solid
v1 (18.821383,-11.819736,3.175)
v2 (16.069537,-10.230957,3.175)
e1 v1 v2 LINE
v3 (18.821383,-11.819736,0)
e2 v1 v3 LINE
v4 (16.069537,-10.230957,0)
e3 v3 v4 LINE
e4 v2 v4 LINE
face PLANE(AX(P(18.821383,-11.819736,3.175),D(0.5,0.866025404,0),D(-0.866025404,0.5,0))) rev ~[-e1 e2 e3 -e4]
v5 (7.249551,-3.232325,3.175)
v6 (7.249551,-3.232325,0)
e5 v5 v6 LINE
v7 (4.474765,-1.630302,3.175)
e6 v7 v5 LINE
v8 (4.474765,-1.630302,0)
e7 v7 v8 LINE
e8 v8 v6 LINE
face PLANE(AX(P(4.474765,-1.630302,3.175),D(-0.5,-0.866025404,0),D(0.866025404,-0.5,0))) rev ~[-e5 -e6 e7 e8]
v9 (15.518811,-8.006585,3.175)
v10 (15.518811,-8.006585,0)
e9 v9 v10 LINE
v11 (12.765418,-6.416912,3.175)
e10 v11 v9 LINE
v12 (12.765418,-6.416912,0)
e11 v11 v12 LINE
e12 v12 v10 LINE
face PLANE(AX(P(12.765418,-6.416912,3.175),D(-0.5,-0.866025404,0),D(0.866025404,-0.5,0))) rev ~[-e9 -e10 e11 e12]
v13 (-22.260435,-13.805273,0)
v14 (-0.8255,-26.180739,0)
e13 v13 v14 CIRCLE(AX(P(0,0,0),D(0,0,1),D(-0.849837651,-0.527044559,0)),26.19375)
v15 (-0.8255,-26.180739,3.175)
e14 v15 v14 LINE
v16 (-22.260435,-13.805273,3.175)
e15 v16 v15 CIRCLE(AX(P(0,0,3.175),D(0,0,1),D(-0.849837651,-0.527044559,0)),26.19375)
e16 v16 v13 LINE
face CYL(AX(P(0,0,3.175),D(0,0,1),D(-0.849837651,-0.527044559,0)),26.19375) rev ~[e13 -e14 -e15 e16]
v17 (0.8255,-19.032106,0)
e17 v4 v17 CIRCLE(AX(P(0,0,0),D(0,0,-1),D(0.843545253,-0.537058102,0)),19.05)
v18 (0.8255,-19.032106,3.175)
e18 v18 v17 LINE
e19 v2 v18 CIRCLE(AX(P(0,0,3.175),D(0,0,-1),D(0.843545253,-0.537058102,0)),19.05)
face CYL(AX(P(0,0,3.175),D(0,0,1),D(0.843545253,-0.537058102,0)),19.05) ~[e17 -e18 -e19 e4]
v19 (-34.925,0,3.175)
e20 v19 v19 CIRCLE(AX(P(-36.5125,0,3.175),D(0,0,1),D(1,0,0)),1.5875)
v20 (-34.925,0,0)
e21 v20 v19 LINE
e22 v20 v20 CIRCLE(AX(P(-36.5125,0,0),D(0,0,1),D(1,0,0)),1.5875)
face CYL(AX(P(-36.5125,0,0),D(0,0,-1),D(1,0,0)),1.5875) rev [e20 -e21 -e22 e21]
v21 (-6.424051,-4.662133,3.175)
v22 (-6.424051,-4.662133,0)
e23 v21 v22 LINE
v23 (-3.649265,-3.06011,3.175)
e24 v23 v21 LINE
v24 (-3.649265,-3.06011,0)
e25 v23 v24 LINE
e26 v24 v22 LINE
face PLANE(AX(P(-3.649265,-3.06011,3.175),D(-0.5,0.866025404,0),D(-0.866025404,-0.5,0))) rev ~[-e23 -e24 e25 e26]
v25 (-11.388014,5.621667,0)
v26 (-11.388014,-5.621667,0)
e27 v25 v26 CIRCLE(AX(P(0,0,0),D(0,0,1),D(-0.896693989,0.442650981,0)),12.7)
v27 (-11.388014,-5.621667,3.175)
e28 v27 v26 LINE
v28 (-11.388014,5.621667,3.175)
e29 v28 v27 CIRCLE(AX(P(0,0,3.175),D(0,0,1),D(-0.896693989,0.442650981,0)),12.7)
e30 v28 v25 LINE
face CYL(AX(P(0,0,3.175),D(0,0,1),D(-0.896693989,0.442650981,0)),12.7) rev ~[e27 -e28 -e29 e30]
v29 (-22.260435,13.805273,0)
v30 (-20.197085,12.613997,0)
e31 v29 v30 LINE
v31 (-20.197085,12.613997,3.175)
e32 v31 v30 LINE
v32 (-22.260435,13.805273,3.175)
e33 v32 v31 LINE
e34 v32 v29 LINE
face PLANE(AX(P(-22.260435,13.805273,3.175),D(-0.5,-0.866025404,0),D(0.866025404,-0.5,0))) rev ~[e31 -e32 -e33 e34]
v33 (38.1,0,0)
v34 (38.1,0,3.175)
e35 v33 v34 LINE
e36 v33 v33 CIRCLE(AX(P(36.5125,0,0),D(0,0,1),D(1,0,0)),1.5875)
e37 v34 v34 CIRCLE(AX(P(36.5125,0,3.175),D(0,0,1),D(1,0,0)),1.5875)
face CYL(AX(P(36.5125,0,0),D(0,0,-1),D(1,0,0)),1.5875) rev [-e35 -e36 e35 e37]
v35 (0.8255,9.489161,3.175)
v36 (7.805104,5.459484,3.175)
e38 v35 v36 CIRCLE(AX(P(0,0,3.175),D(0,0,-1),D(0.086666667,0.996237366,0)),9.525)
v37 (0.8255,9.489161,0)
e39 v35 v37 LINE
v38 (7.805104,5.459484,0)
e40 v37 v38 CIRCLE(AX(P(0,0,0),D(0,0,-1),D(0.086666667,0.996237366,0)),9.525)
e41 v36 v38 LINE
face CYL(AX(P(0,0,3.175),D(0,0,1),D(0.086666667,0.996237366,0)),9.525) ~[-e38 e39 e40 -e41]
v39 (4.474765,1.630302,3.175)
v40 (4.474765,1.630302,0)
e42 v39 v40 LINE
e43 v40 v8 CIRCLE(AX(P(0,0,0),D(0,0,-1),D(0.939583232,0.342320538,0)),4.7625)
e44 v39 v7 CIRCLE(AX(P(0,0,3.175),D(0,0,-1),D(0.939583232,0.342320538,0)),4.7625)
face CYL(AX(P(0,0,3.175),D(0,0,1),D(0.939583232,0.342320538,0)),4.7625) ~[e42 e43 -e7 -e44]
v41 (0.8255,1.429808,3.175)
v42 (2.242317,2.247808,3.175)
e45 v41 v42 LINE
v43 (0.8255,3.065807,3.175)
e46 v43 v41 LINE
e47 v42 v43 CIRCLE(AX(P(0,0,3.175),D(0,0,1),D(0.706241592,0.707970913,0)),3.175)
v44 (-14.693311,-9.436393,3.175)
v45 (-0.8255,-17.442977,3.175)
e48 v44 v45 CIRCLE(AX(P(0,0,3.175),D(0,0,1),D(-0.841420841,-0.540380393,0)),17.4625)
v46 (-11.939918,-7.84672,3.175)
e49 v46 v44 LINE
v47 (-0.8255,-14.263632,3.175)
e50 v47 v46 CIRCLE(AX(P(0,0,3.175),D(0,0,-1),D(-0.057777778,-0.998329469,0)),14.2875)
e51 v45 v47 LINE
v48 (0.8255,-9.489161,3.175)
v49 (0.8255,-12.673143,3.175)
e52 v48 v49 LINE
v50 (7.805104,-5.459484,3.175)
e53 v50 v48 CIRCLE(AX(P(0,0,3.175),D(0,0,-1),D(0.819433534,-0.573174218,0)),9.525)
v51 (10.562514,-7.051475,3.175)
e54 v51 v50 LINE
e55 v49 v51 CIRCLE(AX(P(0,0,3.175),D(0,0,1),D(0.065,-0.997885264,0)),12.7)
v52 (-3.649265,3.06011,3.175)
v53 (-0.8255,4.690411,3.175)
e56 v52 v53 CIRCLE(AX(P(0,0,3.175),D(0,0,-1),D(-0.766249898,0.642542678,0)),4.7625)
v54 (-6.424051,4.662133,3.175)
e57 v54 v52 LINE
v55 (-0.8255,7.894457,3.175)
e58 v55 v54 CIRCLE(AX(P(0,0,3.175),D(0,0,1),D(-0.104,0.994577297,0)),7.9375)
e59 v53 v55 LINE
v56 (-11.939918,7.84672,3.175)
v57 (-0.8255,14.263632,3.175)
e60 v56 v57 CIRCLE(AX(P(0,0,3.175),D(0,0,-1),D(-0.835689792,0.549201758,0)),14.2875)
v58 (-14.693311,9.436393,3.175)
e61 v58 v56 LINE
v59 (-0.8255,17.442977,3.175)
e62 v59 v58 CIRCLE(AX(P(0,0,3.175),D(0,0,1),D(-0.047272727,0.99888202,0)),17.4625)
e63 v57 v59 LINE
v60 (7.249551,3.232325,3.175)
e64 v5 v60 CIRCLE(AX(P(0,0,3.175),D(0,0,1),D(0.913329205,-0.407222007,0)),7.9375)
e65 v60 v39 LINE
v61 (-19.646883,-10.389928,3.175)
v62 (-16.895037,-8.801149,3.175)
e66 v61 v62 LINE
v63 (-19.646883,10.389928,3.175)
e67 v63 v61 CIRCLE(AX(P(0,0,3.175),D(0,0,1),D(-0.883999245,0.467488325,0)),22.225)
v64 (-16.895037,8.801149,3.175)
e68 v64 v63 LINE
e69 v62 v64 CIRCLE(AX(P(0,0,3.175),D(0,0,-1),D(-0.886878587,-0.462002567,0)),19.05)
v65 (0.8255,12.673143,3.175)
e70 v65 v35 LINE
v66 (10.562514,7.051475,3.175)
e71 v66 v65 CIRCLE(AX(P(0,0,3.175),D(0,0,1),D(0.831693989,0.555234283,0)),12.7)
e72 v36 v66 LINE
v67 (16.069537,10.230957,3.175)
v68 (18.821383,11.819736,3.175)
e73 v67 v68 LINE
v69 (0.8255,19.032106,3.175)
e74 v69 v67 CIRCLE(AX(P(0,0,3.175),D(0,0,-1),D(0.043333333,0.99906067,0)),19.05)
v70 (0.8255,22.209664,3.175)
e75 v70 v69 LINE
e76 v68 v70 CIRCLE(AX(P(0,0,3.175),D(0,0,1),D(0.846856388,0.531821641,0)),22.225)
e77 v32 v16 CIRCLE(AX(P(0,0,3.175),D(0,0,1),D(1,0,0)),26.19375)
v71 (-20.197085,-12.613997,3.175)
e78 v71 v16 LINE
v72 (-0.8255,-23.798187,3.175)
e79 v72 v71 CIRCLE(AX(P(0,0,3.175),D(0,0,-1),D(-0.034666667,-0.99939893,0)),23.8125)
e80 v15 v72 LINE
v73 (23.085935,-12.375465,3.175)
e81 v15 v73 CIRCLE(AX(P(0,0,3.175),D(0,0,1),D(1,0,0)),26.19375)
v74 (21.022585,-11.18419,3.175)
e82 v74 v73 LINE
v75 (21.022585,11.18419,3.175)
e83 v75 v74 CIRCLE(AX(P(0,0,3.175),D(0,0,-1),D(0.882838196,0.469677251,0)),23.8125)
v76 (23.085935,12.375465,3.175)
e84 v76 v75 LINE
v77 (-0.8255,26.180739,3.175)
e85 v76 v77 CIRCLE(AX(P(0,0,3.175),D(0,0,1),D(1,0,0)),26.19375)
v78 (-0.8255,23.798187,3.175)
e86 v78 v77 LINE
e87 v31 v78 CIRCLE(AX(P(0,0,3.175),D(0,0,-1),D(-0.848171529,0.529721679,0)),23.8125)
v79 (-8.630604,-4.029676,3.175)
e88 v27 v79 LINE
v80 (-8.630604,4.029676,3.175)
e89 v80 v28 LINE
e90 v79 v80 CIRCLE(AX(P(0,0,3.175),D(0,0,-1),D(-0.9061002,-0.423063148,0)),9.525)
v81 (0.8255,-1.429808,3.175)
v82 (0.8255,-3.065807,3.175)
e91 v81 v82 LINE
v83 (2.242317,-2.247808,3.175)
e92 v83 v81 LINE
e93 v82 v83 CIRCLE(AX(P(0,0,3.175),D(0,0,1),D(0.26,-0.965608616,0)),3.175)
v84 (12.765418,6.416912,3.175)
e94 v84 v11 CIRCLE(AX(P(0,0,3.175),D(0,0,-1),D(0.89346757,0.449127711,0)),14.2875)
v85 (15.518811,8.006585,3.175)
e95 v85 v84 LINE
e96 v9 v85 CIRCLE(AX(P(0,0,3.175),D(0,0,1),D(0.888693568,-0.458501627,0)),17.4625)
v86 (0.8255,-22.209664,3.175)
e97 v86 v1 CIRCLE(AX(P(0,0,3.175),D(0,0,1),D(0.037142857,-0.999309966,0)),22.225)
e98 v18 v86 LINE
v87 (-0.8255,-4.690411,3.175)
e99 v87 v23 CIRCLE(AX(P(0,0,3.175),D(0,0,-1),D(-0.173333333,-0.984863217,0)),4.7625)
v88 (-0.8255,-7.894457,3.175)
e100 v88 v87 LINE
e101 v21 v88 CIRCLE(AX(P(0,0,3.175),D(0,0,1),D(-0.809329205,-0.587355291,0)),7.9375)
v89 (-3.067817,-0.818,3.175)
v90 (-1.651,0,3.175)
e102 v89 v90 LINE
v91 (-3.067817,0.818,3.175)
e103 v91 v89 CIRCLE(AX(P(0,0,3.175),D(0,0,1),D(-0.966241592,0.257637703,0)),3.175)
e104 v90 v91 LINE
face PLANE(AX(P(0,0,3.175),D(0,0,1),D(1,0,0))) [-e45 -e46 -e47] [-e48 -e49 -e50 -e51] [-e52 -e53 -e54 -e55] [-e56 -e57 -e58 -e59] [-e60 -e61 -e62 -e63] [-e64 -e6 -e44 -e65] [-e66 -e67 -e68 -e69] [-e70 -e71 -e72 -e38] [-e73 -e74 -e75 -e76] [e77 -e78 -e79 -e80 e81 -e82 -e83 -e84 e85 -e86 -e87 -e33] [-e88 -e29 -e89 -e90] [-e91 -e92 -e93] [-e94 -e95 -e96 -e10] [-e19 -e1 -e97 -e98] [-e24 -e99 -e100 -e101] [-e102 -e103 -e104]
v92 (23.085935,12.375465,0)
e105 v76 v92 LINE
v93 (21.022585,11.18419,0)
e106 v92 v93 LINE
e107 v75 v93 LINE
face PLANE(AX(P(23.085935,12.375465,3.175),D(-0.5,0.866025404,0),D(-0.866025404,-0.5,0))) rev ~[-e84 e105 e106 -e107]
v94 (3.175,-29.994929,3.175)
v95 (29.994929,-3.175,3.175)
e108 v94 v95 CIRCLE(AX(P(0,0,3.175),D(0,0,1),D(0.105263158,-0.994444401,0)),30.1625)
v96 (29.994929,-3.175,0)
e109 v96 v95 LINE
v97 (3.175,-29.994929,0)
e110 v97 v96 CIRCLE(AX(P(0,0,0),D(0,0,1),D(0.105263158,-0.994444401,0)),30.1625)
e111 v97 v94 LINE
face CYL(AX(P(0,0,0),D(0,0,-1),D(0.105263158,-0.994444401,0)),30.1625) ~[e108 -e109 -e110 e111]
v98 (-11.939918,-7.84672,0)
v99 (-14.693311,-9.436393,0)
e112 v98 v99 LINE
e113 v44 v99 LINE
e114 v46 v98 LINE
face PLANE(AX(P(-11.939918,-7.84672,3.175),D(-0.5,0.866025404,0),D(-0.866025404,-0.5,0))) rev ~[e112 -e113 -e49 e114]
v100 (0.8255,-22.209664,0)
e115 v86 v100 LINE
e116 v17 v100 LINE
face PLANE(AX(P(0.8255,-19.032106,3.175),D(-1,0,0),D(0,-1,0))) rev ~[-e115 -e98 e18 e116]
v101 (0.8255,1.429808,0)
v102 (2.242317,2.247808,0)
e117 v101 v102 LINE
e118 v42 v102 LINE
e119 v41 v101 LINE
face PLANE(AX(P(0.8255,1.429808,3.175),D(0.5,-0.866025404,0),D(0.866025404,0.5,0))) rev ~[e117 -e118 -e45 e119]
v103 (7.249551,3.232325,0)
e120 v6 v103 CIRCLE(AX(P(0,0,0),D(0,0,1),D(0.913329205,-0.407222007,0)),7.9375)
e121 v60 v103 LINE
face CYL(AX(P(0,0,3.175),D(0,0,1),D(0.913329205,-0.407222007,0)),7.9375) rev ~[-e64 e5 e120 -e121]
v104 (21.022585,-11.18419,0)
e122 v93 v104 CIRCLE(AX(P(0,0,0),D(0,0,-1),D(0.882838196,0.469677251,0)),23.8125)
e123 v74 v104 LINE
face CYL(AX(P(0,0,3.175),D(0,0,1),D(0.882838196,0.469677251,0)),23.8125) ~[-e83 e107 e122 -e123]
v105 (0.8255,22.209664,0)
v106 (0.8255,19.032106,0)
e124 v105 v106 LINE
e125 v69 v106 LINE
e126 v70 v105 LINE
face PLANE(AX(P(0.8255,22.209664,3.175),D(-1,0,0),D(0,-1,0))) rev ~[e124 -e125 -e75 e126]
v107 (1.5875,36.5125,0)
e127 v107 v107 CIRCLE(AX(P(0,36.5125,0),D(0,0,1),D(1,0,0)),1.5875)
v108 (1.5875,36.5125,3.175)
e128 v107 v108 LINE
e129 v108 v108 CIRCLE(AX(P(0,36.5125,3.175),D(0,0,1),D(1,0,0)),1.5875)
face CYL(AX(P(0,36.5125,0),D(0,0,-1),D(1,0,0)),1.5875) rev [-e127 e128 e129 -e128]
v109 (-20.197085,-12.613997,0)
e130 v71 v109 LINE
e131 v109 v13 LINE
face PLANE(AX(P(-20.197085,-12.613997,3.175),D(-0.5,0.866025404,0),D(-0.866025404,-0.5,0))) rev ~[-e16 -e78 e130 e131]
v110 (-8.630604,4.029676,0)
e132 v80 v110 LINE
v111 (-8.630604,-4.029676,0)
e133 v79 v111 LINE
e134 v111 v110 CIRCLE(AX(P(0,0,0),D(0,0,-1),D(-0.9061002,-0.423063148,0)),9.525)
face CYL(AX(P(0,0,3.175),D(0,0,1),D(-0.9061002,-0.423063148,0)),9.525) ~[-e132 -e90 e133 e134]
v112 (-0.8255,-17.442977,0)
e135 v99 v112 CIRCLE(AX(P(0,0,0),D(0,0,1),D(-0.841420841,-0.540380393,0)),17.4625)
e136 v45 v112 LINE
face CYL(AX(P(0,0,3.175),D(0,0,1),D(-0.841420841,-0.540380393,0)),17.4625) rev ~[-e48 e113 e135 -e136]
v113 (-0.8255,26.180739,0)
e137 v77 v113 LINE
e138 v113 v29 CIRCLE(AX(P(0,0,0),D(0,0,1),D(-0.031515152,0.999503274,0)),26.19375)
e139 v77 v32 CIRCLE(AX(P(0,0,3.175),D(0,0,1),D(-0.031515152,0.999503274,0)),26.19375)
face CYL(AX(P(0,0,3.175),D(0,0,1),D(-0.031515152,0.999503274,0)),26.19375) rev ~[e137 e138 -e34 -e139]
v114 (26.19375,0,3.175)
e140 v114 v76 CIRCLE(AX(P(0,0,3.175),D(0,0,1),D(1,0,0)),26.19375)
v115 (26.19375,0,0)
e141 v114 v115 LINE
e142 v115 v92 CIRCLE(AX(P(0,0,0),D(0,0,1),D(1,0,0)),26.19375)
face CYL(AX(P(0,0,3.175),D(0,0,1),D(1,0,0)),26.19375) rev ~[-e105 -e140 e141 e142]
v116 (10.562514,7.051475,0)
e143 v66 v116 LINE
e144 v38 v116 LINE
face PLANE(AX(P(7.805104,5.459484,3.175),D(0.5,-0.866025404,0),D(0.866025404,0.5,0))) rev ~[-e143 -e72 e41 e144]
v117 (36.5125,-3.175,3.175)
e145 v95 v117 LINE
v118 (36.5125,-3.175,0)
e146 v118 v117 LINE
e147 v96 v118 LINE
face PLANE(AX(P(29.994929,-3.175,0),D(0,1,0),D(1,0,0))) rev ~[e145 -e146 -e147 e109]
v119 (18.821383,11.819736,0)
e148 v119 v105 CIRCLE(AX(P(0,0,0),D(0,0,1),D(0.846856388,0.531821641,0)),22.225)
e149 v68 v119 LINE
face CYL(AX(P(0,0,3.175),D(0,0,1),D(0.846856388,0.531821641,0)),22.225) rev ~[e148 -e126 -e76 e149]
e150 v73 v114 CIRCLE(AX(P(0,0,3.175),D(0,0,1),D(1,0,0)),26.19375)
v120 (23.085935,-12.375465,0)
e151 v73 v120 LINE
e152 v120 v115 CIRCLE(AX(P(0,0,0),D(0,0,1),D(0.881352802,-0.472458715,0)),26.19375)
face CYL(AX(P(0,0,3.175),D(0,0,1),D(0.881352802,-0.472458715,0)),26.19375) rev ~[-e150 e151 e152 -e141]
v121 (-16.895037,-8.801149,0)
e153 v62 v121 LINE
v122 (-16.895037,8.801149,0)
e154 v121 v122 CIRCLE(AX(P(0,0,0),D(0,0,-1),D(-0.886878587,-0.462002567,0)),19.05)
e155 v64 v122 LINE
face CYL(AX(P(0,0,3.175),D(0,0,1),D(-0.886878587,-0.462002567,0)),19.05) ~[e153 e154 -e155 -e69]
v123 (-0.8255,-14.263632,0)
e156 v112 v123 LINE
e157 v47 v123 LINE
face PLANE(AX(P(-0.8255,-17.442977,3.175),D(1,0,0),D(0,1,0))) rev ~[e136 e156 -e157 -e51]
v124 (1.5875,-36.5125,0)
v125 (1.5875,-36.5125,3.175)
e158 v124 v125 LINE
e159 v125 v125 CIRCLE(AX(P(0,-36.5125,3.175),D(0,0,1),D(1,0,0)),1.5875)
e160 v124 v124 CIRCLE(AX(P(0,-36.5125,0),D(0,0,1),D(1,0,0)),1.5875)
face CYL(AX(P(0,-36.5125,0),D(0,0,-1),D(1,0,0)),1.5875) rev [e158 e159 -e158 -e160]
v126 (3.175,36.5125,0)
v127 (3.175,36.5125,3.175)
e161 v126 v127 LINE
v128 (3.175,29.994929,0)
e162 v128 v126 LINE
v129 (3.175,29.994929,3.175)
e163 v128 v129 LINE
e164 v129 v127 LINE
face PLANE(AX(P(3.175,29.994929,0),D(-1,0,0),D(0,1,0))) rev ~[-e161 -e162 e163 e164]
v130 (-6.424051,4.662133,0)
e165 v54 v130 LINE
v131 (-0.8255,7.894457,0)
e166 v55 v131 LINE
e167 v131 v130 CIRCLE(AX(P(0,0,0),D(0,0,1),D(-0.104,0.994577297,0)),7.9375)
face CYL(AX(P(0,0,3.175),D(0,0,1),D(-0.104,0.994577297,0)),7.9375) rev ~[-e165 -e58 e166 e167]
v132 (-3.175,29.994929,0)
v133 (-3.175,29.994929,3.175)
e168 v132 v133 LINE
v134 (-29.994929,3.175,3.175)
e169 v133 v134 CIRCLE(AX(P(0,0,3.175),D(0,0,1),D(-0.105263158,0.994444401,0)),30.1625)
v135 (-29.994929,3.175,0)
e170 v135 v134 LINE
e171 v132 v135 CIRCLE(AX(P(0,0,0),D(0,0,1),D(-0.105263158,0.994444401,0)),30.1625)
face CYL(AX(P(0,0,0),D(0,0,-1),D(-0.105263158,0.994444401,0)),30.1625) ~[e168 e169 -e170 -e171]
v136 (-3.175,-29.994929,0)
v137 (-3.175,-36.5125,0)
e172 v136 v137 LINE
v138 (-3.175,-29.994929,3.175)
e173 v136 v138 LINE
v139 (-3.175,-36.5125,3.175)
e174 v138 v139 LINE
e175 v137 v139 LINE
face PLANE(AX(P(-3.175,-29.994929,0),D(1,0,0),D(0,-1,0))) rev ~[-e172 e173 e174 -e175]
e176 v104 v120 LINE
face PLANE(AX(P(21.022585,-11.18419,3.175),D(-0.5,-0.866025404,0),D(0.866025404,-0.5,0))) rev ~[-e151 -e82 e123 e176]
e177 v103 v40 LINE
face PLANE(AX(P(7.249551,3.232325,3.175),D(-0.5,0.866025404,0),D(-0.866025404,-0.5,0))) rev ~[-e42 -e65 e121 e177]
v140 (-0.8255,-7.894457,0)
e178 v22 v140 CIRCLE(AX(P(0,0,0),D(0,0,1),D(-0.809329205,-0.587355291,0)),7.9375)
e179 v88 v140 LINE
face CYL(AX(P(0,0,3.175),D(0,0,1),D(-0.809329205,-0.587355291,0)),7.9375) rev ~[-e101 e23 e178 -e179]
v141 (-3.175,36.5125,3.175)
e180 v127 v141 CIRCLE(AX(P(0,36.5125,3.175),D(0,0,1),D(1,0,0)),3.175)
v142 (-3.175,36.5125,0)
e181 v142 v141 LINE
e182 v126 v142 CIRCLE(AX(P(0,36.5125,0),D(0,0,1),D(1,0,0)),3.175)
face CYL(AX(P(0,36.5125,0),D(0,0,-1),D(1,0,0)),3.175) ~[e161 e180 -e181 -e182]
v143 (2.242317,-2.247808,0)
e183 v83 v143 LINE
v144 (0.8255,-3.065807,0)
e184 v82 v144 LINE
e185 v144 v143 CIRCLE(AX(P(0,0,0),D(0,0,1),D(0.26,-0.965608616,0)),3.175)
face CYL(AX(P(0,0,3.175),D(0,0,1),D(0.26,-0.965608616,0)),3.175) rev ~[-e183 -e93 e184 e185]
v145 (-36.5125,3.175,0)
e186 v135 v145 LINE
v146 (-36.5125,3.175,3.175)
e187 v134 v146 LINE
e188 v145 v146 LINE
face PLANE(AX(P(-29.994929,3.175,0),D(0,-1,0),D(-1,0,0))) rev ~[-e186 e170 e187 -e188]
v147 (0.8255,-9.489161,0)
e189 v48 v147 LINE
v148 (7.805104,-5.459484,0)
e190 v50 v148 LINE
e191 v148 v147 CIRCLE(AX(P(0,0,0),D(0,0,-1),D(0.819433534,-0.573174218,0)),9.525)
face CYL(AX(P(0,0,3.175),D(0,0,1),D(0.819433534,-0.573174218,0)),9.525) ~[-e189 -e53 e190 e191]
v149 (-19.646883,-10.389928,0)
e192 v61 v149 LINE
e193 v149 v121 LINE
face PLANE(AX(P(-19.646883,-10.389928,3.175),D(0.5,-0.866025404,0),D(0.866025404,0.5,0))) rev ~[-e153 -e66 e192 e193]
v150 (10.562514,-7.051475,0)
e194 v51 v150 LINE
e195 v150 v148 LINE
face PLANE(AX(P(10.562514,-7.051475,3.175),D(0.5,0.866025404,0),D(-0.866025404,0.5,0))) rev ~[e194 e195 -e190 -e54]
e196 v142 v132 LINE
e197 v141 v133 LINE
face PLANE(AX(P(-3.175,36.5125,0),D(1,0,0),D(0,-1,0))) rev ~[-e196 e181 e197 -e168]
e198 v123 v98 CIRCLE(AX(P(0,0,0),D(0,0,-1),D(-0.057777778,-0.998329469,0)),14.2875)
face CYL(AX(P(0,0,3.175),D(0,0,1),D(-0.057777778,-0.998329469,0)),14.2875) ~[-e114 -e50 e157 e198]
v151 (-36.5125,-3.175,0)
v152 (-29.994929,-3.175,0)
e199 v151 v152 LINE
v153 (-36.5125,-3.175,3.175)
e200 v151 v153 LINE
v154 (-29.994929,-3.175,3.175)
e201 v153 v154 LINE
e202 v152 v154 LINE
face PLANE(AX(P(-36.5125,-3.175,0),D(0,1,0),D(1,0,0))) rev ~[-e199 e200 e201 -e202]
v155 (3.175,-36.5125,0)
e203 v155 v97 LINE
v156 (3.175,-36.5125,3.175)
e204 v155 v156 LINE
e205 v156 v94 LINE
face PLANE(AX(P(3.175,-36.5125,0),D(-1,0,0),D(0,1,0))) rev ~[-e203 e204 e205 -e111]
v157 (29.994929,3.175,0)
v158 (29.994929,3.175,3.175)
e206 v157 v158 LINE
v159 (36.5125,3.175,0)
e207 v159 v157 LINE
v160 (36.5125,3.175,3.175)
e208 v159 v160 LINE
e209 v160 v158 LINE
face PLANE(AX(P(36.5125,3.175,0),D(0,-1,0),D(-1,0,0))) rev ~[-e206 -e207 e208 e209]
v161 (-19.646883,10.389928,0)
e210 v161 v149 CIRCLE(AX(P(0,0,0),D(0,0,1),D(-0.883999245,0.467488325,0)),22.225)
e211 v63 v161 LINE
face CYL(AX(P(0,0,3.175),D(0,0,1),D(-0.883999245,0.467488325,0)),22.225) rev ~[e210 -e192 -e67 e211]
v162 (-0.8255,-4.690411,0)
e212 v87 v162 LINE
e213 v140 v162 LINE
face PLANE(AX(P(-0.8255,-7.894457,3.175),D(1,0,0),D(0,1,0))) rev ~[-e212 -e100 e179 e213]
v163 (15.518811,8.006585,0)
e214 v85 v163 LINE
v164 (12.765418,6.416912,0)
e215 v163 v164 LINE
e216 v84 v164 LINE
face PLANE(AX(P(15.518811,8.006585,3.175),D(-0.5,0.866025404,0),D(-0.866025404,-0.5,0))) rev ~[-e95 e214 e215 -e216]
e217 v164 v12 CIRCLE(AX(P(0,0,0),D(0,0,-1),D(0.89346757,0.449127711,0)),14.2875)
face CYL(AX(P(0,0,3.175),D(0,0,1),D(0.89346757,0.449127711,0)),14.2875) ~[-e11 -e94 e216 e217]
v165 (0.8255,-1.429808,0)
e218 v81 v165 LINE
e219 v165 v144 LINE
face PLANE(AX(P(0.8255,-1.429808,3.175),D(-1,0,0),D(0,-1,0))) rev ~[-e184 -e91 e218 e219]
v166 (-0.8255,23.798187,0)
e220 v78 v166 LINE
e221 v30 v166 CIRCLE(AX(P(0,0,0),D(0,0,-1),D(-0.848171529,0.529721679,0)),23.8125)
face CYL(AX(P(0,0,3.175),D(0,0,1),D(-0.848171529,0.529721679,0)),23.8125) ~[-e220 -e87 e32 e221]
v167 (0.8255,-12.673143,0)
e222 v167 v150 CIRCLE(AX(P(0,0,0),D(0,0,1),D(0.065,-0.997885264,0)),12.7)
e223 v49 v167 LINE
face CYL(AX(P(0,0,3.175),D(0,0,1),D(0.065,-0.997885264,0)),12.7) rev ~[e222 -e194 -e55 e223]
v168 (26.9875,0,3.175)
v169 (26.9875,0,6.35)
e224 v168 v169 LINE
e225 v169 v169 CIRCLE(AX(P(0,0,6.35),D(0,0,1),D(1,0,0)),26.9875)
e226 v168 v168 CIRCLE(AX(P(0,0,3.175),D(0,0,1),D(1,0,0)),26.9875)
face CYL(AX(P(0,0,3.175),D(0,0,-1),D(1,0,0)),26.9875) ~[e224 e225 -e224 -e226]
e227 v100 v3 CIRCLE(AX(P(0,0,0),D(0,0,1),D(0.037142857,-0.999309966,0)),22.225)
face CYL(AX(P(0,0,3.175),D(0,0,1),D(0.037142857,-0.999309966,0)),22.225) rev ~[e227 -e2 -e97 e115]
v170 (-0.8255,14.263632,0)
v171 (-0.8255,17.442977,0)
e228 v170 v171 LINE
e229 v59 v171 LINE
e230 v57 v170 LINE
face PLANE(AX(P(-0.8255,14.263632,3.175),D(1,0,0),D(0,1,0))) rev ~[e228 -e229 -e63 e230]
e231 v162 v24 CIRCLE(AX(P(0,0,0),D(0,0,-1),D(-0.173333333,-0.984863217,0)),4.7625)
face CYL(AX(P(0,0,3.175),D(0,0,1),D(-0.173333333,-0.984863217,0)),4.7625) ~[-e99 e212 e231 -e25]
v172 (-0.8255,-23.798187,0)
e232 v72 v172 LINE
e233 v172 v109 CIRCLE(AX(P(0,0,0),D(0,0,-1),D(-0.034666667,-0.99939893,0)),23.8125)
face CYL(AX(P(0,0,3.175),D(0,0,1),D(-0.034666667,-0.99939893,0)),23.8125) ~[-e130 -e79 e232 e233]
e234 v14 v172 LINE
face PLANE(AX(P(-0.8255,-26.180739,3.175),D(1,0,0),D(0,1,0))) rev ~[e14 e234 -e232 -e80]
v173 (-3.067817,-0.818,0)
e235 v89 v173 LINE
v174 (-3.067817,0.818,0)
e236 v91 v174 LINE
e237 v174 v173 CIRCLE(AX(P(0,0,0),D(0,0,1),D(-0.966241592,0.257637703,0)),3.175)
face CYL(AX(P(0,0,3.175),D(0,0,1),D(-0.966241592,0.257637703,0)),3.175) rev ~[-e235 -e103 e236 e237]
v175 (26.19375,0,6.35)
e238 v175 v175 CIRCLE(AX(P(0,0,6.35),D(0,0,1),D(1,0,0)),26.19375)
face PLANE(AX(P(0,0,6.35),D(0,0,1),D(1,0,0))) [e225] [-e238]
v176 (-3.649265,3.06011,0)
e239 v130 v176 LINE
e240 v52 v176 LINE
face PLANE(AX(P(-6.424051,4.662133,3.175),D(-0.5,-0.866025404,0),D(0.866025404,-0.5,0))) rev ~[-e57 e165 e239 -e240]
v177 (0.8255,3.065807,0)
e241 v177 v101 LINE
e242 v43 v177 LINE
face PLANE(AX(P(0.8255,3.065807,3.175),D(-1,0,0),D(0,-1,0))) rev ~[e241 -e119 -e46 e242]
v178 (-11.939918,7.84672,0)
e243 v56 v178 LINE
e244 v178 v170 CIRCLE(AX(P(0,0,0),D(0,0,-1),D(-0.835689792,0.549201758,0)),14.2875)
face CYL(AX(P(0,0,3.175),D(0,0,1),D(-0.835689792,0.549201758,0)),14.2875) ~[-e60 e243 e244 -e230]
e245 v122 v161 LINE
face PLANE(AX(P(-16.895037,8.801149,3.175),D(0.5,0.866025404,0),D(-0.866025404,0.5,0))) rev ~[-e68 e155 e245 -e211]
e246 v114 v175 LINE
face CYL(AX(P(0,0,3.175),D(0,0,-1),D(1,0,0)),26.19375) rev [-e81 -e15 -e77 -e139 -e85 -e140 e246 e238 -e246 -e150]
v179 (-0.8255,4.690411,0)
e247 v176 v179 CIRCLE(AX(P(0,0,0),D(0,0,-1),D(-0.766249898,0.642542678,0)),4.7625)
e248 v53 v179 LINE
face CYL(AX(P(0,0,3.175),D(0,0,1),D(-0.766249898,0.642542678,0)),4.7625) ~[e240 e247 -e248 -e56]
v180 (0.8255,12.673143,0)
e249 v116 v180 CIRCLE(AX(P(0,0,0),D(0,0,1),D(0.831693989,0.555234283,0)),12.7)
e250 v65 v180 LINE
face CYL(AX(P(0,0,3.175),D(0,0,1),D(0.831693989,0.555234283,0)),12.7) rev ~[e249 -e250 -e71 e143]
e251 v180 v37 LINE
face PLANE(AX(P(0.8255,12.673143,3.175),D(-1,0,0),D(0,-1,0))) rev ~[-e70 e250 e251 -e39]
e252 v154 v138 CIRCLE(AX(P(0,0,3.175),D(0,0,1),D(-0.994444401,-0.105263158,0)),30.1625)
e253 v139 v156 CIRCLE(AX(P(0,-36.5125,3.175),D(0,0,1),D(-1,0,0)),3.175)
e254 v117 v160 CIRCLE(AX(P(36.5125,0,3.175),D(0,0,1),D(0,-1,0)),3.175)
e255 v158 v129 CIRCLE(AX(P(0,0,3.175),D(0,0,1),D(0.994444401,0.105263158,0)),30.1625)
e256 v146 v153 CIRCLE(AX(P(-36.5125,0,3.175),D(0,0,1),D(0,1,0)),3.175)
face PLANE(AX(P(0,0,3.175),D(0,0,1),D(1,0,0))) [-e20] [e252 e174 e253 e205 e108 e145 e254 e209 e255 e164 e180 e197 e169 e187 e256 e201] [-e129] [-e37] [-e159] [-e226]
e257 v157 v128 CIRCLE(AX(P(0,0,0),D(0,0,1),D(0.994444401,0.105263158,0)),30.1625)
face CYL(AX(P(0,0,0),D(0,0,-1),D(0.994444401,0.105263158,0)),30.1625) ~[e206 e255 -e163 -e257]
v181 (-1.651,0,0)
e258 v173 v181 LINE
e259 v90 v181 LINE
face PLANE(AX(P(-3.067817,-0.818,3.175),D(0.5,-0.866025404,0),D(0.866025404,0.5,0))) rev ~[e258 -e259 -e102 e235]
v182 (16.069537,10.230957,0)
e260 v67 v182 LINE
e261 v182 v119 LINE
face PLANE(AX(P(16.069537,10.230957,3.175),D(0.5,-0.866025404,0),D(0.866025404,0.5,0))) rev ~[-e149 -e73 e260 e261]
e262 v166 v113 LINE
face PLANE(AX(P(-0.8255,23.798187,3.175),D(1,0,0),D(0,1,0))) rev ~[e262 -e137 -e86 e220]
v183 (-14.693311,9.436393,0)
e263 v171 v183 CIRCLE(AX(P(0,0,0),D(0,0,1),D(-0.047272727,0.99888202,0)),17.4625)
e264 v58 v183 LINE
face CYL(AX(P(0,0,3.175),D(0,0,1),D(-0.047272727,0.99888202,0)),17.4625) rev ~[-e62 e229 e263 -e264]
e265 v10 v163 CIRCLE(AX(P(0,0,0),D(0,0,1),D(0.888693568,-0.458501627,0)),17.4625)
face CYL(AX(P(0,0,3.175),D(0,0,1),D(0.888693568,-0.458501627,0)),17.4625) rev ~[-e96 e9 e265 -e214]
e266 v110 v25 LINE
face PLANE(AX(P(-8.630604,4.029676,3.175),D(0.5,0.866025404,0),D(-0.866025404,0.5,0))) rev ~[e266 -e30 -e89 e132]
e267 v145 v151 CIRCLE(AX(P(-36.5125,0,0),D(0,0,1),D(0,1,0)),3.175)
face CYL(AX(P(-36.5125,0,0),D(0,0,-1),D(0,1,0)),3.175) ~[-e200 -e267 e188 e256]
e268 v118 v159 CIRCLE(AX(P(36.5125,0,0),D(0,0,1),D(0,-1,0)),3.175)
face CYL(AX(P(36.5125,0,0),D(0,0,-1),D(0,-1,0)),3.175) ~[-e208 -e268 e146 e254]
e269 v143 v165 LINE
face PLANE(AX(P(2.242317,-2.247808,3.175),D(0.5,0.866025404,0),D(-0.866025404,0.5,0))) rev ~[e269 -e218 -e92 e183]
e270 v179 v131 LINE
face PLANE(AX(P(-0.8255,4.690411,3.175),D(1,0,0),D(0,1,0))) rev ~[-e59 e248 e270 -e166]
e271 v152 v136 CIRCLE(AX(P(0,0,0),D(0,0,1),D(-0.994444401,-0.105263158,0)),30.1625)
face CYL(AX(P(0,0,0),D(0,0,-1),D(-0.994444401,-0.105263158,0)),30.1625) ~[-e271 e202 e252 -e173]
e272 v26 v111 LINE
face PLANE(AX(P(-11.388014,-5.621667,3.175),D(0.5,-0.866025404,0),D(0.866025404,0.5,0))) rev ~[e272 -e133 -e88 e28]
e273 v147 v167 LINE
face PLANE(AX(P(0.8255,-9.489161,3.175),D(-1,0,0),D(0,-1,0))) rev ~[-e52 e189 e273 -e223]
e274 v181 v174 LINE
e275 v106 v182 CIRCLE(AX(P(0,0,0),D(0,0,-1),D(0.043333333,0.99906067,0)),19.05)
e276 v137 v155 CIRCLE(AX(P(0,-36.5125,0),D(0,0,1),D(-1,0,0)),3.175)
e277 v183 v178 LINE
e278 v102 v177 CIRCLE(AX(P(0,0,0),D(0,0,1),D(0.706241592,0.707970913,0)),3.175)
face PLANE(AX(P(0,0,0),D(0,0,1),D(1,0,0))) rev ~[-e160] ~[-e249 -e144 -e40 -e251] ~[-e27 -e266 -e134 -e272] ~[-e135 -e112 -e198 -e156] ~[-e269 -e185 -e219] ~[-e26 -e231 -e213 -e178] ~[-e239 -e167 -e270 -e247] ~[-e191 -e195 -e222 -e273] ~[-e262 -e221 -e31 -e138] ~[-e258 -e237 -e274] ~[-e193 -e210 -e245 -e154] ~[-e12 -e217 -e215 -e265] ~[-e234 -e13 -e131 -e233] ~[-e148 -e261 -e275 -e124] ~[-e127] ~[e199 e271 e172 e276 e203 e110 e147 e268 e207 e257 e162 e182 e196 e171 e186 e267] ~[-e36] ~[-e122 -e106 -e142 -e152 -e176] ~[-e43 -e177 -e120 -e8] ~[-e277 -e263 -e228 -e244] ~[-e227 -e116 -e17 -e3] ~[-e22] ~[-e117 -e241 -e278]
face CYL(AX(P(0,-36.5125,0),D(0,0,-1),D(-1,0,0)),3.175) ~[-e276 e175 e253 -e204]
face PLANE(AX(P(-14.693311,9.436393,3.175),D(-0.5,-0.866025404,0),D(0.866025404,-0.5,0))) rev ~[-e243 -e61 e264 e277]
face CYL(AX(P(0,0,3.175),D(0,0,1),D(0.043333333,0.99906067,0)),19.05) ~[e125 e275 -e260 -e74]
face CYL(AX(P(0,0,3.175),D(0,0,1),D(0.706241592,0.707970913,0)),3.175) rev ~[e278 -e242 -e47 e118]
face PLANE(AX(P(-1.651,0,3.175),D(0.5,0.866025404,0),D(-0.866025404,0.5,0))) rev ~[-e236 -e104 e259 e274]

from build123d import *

# Parameters (mm, degrees)
F0_R     = 1.5875
F1_DEPTH = 3.175
F2_R     = 26.9875
F2_R_2   = 26.19375
F3_DEPTH = 3.175
F5_DEPTH = 3.175


# Not quite as in the source:
# - after a boolean that leaves OpenCascade's solid faulty, fix() repairs it


with BuildPart() as f1:
    # F0 (on Top) → F1 (new body)
    with BuildSketch(Plane.XY):
        with BuildLine():
            Line((36.5125, 3.175), (29.994929259, 3.175))
            ThreePointArc((29.994929259, 3.175), (21.3281082875, 21.3281082875), (3.175, 29.994929259))
            Line((3.175, 29.994929259), (3.175, 36.5125))
            ThreePointArc((3.175, 36.5125), (0, 39.6875), (-3.175, 36.5125))
            Line((-3.175, 36.5125), (-3.175, 29.994929259))
            ThreePointArc((-3.175, 29.994929259), (-21.3281082875, 21.3281082875), (-29.994929259, 3.175))
            Line((-29.994929259, 3.175), (-30.1625, 3.175))
            Line((-30.1625, 3.175), (-36.5125, 3.175))
            ThreePointArc((-36.5125, 3.175), (-39.6875, 0), (-36.5125, -3.175))
            Line((-36.5125, -3.175), (-30.1625, -3.175))
            Line((-30.1625, -3.175), (-29.994929259, -3.175))
            ThreePointArc((-29.994929259, -3.175), (-21.3281082875, -21.3281082875), (-3.175, -29.994929259))
            Line((-3.175, -29.994929259), (-3.175, -36.5125))
            ThreePointArc((-3.175, -36.5125), (0, -39.6875), (3.175, -36.5125))
            Line((3.175, -36.5125), (3.175, -29.994929259))
            ThreePointArc((3.175, -29.994929259), (21.3281082875, -21.3281082875), (29.994929259, -3.175))
            Line((29.994929259, -3.175), (36.5125, -3.175))
            ThreePointArc((36.5125, -3.175), (39.6875, 0), (36.5125, 3.175))
        make_face()
        with Locations((0, -36.5125)):
            Circle(F0_R, mode=Mode.SUBTRACT)
        with Locations((-36.5125, 0)):
            Circle(F0_R, mode=Mode.SUBTRACT)
        with Locations((36.5125, 0)):
            Circle(F0_R, mode=Mode.SUBTRACT)
        with Locations((0, 36.5125)):
            Circle(F0_R, mode=Mode.SUBTRACT)
    extrude(amount=F1_DEPTH)

    # F2 (on face) → F3 (join)
    with BuildSketch(Plane.XY.offset(3.175)):
        Circle(F2_R)
        Circle(F2_R_2, mode=Mode.SUBTRACT)
    extrude(amount=F3_DEPTH)

    # F4 (on face) → F5 (cut)
    with BuildSketch(Plane.XY.offset(3.175)):
        with BuildLine():
            ThreePointArc((-0.8255, 26.1807388897), (-13.096875, 22.6844529204), (-22.2604349684, 13.8052734157))
            Line((-22.2604349684, 13.8052734157), (-20.1970845335, 12.6139974867))
            ThreePointArc((-20.1970845335, 12.6139974867), (-11.90625, 20.6222299276), (-0.8255, 23.7981870318))
            Line((-0.8255, 23.7981870318), (-0.8255, 26.1807388897))
        make_face()
        with BuildLine():
            ThreePointArc((0.8255, 19.0321057624), (9.525, 16.4977839421), (16.0695370777, 10.230956852))
            Line((16.0695370777, 10.230956852), (18.8213832288, 11.8197359681))
            ThreePointArc((18.8213832288, 11.8197359681), (11.1125, 19.2474145991), (0.8255, 22.2096639945))
            Line((0.8255, 22.2096639945), (0.8255, 19.0321057624))
        make_face()
        with BuildLine():
            Line((21.0225845335, -11.1841895451), (23.0859349684, -12.375465474))
            ThreePointArc((23.0859349684, -12.375465474), (25.4049183047, -6.3798640262), (26.19375, 0))
            ThreePointArc((26.19375, 0), (25.4049183047, 6.3798640262), (23.0859349684, 12.375465474))
            Line((23.0859349684, 12.375465474), (21.0225845335, 11.1841895451))
            ThreePointArc((21.0225845335, 11.1841895451), (23.8125, 0), (21.0225845335, -11.1841895451))
        make_face()
        with BuildLine():
            Line((12.7654179102, -6.4169121723), (15.5188114324, -8.0065846636))
            ThreePointArc((15.5188114324, -8.0065846636), (17.4625, 0), (15.5188114324, 8.0065846636))
            Line((15.5188114324, 8.0065846636), (12.7654179102, 6.4169121723))
            ThreePointArc((12.7654179102, 6.4169121723), (14.2875, 0), (12.7654179102, -6.4169121723))
        make_face()
        with BuildLine():
            Line((4.4747651403, -1.6303015639), (7.2495505675, -3.2323246772))
            ThreePointArc((7.2495505675, -3.2323246772), (7.9375, 0), (7.2495505675, 3.2323246772))
            Line((7.2495505675, 3.2323246772), (4.4747651403, 1.6303015639))
            ThreePointArc((4.4747651403, 1.6303015639), (4.7625, 0), (4.4747651403, -1.6303015639))
        make_face()
        with BuildLine():
            ThreePointArc((0.8255, 9.4891609086), (4.7625, 8.248891971), (7.8051044075, 5.4594844251))
            Line((7.8051044075, 5.4594844251), (10.5625136557, 7.0514753969))
            ThreePointArc((10.5625136557, 7.0514753969), (6.35, 10.9985226281), (0.8255, 12.6731428521))
            Line((0.8255, 12.6731428521), (0.8255, 9.4891609086))
        make_face()
        with BuildLine():
            ThreePointArc((-11.9399179102, 7.846720114), (-7.14375, 12.3733379566), (-0.8255, 14.2636322863))
            Line((-0.8255, 14.2636322863), (-0.8255, 17.4429772688))
            ThreePointArc((-0.8255, 17.4429772688), (-8.73125, 15.1229686136), (-14.6933114324, 9.4363926052))
            Line((-14.6933114324, 9.4363926052), (-11.9399179102, 7.846720114))
        make_face()
        with BuildLine():
            ThreePointArc((-16.8950370777, -8.8011489104), (-19.05, 0), (-16.8950370777, 8.8011489104))
            Line((-16.8950370777, 8.8011489104), (-19.6468832288, 10.3899280264))
            ThreePointArc((-19.6468832288, 10.3899280264), (-22.225, 0), (-19.6468832288, -10.3899280264))
            Line((-19.6468832288, -10.3899280264), (-16.8950370777, -8.8011489104))
        make_face()
        with BuildLine():
            ThreePointArc((-8.6306044075, -4.0296764835), (-9.525, 0), (-8.6306044075, 4.0296764835))
            Line((-8.6306044075, 4.0296764835), (-11.3880136557, 5.6216674552))
            ThreePointArc((-11.3880136557, 5.6216674552), (-12.7, 0), (-11.3880136557, -5.6216674552))
            Line((-11.3880136557, -5.6216674552), (-8.6306044075, -4.0296764835))
        make_face()
        with BuildLine():
            ThreePointArc((-0.8255, -14.2636322863), (-7.14375, -12.3733379566), (-11.9399179102, -7.846720114))
            Line((-11.9399179102, -7.846720114), (-14.6933114324, -9.4363926052))
            ThreePointArc((-14.6933114324, -9.4363926052), (-8.73125, -15.1229686136), (-0.8255, -17.4429772688))
            Line((-0.8255, -17.4429772688), (-0.8255, -14.2636322863))
        make_face()
        with BuildLine():
            ThreePointArc((-22.2604349684, -13.8052734157), (-13.096875, -22.6844529204), (-0.8255, -26.1807388897))
            Line((-0.8255, -26.1807388897), (-0.8255, -23.7981870318))
            ThreePointArc((-0.8255, -23.7981870318), (-11.90625, -20.6222299276), (-20.1970845335, -12.6139974867))
            Line((-20.1970845335, -12.6139974867), (-22.2604349684, -13.8052734157))
        make_face()
        with BuildLine():
            ThreePointArc((16.0695370777, -10.230956852), (9.525, -16.4977839421), (0.8255, -19.0321057624))
            Line((0.8255, -19.0321057624), (0.8255, -22.2096639945))
            ThreePointArc((0.8255, -22.2096639945), (11.1125, -19.2474145991), (18.8213832288, -11.8197359681))
            Line((18.8213832288, -11.8197359681), (16.0695370777, -10.230956852))
        make_face()
        with BuildLine():
            ThreePointArc((7.8051044075, -5.4594844251), (4.7625, -8.248891971), (0.8255, -9.4891609086))
            Line((0.8255, -9.4891609086), (0.8255, -12.6731428521))
            ThreePointArc((0.8255, -12.6731428521), (6.35, -10.9985226281), (10.5625136557, -7.0514753969))
            Line((10.5625136557, -7.0514753969), (7.8051044075, -5.4594844251))
        make_face()
        with BuildLine():
            ThreePointArc((-0.8255, -4.6904110694), (-2.38125, -4.1244459855), (-3.6492651403, -3.0601095055))
            Line((-3.6492651403, -3.0601095055), (-6.4240505675, -4.6621326189))
            ThreePointArc((-6.4240505675, -4.6621326189), (-3.96875, -6.8740766425), (-0.8255, -7.8944572961))
            Line((-0.8255, -7.8944572961), (-0.8255, -4.6904110694))
        make_face()
        with BuildLine():
            ThreePointArc((-3.6492651403, 3.0601095055), (-2.38125, 4.1244459855), (-0.8255, 4.6904110694))
            Line((-0.8255, 4.6904110694), (-0.8255, 7.8944572961))
            ThreePointArc((-0.8255, 7.8944572961), (-3.96875, 6.8740766425), (-6.4240505675, 4.6621326189))
            Line((-6.4240505675, 4.6621326189), (-3.6492651403, 3.0601095055))
        make_face()
        with BuildLine():
            Line((0.8255, 1.4298079416), (2.2423170542, 2.2478076493))
            ThreePointArc((2.2423170542, 2.2478076493), (1.5875, 2.749630657), (0.8255, 3.065807357))
            Line((0.8255, 3.065807357), (0.8255, 1.4298079416))
        make_face()
        with BuildLine():
            Line((0.8255, -1.4298079416), (0.8255, -3.065807357))
            ThreePointArc((0.8255, -3.065807357), (1.5875, -2.749630657), (2.2423170542, -2.2478076493))
            Line((2.2423170542, -2.2478076493), (0.8255, -1.4298079416))
        make_face()
        with BuildLine():
            Line((-1.651, 0), (-3.0678170542, 0.8179997077))
            ThreePointArc((-3.0678170542, 0.8179997077), (-3.175, 0), (-3.0678170542, -0.8179997077))
            Line((-3.0678170542, -0.8179997077), (-1.651, 0))
        make_face()
    extrude(amount=-F5_DEPTH, mode=Mode.SUBTRACT)

    add(f1.part.fix(), mode=Mode.REPLACE)


solid = f1.part
